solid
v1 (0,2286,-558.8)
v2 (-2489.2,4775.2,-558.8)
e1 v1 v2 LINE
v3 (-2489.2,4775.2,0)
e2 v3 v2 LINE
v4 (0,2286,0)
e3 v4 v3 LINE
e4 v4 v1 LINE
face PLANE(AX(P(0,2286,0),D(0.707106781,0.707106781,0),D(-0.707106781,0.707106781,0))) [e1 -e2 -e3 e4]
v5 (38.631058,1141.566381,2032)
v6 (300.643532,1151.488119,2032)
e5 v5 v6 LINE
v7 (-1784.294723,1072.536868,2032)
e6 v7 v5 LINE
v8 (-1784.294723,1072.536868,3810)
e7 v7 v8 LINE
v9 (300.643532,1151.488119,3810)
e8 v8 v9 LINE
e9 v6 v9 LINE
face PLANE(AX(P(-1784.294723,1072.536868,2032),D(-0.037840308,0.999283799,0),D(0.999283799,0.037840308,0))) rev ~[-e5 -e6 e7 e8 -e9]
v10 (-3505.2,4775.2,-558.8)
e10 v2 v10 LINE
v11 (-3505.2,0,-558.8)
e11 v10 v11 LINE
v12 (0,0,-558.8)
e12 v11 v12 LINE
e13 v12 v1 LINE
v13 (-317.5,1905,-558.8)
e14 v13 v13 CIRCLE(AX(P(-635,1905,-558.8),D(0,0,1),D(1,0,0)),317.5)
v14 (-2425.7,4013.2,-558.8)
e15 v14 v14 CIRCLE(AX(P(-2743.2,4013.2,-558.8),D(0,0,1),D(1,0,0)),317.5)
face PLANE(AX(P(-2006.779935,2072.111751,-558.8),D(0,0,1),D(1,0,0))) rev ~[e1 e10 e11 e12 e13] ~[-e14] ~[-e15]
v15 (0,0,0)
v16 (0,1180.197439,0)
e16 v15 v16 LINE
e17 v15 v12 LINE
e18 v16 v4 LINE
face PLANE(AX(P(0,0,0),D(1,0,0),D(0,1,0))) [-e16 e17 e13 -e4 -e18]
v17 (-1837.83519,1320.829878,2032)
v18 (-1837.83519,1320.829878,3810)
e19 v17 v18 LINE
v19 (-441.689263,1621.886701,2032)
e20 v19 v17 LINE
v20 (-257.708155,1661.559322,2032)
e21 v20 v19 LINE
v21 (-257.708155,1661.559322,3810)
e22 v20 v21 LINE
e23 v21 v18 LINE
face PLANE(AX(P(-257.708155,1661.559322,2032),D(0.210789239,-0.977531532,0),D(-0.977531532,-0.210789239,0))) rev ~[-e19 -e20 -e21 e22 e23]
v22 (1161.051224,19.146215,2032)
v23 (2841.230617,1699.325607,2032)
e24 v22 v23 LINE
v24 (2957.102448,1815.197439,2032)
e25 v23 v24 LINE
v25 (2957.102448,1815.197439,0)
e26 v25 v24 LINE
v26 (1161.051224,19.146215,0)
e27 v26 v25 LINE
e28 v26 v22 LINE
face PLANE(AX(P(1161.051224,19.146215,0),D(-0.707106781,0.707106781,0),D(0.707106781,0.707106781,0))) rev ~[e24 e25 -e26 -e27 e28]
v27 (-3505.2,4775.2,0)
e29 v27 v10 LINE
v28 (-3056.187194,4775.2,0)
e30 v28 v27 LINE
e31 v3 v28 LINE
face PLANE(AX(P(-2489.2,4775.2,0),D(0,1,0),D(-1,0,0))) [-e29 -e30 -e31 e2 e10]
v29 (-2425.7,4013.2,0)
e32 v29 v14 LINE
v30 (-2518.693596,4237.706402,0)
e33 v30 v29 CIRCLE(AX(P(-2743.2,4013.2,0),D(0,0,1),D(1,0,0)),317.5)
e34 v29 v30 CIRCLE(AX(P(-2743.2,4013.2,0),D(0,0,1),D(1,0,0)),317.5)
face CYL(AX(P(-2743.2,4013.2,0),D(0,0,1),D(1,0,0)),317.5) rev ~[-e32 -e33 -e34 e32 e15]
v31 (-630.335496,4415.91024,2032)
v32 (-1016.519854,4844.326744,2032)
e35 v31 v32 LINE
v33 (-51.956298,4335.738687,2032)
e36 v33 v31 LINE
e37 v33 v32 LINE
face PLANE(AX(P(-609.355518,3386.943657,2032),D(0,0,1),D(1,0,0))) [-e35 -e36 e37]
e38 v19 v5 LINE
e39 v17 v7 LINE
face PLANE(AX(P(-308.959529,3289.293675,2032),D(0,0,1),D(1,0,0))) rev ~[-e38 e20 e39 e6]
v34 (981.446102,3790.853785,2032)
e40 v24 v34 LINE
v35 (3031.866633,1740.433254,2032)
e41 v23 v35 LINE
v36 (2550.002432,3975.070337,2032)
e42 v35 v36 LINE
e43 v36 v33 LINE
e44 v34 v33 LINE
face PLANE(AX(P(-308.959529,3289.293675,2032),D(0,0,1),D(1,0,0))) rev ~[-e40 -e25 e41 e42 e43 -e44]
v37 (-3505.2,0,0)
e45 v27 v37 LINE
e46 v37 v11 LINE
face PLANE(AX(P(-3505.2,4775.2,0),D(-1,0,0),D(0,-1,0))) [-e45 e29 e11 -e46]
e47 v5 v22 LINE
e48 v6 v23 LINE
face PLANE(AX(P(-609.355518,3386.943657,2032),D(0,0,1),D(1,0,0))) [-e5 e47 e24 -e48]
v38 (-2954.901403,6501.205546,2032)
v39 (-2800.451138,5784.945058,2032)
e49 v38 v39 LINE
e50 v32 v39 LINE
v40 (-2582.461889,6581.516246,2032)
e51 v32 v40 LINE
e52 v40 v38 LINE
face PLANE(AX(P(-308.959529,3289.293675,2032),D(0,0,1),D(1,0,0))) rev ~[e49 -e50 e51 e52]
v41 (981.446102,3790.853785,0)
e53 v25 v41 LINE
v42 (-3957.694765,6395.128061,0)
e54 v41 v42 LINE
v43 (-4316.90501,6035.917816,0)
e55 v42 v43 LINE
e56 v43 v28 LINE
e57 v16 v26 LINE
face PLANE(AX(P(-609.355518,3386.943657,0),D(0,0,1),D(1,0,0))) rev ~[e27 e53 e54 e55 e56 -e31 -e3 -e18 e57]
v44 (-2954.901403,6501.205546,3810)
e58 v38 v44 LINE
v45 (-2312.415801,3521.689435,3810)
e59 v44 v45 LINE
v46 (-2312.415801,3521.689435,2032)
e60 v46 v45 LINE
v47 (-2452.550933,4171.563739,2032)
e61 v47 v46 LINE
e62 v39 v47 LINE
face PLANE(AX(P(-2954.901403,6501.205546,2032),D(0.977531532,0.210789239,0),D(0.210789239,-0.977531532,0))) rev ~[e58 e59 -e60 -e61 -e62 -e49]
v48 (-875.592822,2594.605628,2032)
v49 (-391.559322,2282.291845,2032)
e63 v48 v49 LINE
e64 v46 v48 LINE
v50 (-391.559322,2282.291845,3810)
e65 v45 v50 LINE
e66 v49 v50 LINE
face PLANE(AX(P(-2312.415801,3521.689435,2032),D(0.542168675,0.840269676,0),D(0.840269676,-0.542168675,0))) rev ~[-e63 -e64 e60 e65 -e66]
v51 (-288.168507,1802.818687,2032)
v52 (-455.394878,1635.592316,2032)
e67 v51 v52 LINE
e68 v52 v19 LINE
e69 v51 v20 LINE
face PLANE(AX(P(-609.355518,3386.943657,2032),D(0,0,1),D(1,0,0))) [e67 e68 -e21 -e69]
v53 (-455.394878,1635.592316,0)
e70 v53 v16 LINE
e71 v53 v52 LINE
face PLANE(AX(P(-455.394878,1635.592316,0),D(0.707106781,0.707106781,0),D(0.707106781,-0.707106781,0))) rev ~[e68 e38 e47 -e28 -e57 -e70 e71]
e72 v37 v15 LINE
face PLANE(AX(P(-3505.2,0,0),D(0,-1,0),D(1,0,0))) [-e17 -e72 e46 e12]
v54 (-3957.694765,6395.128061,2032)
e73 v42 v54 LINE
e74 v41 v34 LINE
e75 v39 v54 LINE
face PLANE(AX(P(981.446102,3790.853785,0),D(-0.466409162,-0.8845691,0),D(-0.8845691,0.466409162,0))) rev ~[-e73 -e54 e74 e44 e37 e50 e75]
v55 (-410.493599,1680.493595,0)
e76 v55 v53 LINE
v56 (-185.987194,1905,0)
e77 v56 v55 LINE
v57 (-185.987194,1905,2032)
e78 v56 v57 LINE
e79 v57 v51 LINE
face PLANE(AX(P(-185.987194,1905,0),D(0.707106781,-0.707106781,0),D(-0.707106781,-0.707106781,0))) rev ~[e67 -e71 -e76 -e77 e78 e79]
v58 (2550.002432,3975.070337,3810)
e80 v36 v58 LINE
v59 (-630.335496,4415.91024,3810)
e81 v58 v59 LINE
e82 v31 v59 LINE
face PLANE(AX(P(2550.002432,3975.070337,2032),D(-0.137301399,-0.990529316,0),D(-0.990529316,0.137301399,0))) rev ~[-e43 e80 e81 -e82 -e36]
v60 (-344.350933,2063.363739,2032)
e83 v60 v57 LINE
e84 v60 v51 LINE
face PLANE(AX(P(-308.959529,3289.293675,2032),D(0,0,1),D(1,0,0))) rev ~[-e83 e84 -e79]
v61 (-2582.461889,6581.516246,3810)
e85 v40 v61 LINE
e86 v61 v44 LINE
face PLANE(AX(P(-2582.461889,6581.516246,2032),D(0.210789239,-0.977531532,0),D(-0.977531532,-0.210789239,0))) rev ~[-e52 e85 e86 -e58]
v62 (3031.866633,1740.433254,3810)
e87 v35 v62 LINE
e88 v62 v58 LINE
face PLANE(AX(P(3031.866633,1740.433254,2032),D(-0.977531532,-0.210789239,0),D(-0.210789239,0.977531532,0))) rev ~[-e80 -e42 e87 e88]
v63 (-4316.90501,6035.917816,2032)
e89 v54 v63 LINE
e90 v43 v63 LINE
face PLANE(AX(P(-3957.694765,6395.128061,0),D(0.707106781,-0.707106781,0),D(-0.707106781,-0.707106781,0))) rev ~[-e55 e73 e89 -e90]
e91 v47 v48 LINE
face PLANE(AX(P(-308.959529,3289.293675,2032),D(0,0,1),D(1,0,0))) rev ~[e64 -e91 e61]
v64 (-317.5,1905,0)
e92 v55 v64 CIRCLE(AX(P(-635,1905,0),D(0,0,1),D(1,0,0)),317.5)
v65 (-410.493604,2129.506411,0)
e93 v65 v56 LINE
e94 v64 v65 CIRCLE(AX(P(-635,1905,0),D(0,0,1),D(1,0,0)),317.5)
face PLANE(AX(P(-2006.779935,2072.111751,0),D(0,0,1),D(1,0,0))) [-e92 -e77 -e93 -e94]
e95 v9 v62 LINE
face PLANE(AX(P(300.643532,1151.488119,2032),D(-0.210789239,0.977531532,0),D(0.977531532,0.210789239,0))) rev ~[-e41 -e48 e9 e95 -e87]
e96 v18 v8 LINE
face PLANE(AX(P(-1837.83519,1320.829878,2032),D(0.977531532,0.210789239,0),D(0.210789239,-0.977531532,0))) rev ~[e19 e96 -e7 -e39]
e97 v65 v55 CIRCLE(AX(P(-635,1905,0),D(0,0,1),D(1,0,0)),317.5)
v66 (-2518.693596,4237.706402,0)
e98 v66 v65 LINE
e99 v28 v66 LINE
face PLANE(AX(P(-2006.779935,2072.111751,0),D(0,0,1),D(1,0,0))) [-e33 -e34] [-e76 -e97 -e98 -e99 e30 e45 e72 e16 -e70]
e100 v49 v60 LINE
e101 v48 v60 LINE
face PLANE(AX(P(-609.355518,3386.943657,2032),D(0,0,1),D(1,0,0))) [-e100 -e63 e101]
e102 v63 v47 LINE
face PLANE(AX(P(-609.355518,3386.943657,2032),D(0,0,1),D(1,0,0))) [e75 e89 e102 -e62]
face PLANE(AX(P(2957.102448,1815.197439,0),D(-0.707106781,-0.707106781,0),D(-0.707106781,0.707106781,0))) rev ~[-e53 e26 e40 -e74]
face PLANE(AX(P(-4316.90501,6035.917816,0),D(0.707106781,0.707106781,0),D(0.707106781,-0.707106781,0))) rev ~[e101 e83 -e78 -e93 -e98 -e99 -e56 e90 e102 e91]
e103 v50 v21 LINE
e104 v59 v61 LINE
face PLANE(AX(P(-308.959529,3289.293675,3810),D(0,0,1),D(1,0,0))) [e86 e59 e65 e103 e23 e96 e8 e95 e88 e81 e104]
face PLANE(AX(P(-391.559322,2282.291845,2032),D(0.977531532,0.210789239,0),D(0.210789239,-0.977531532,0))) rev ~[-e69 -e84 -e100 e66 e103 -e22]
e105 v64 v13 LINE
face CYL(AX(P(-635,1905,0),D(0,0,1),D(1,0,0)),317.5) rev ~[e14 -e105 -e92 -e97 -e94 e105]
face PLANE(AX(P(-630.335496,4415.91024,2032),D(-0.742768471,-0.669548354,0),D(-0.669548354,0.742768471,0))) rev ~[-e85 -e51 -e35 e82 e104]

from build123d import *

# Parameters (mm, degrees)
F0_R     = 317.5
F2_DEPTH = 558.8
F4_DEPTH = 2032
F6_DEPTH = 1778


# Not quite as in the source:
# - the program builds the solid bodies; features that only make, move or delete a surface that nothing else refers to are left out


with BuildPart() as f2:
    # F0 (on Top) → F2 (new body)
    with BuildSketch(Plane.XY):
        Polygon((-2489.2, 4775.2), (-3505.2, 4775.2), (-3505.2, 4013.2), (-3505.2, 0), (0, 0), (0, 2286), (-508, 2794), align=None)
        with Locations((-2743.2, 4013.2)):
            Circle(F0_R, mode=Mode.SUBTRACT)
        with Locations((-635, 1905)):
            Circle(F0_R, mode=Mode.SUBTRACT)
    extrude(amount=-F2_DEPTH)

    # F1 (on face) → F4 (join)
    with BuildSketch(Plane.XY):
        Polygon((-3957.6947647956, 6395.1280605346), (-4316.9050096384, 6035.9178156918), (-185.9871939465, 1905), (-455.3948775786, 1635.5923163679), (1161.0512242138, 19.1462145755), (2957.1024484277, 1815.1974387893), (981.4461017924, 3790.8537854245), align=None)
    extrude(amount=F4_DEPTH)

    # F5 (on face) → F6 (join)
    with BuildSketch(Plane.XY.offset(2032)):
        Polygon((-257.708154999, 1661.5593220192), (-1837.8351896914, 1320.8298776882), (-1784.2947228834, 1072.5368684955), (300.6435319736, 1151.4881192346), (3031.8666330935, 1740.4332541235), (2550.0024318207, 3975.0703368579), (-630.3354958211, 4415.9102396305), (-2582.4618889505, 6581.5162458871), (-2954.9014027396, 6501.205545675), (-2312.4158010426, 3521.6894353624), (-391.5593220192, 2282.291845001), align=None)
    extrude(amount=F6_DEPTH)


solid = f2.part
